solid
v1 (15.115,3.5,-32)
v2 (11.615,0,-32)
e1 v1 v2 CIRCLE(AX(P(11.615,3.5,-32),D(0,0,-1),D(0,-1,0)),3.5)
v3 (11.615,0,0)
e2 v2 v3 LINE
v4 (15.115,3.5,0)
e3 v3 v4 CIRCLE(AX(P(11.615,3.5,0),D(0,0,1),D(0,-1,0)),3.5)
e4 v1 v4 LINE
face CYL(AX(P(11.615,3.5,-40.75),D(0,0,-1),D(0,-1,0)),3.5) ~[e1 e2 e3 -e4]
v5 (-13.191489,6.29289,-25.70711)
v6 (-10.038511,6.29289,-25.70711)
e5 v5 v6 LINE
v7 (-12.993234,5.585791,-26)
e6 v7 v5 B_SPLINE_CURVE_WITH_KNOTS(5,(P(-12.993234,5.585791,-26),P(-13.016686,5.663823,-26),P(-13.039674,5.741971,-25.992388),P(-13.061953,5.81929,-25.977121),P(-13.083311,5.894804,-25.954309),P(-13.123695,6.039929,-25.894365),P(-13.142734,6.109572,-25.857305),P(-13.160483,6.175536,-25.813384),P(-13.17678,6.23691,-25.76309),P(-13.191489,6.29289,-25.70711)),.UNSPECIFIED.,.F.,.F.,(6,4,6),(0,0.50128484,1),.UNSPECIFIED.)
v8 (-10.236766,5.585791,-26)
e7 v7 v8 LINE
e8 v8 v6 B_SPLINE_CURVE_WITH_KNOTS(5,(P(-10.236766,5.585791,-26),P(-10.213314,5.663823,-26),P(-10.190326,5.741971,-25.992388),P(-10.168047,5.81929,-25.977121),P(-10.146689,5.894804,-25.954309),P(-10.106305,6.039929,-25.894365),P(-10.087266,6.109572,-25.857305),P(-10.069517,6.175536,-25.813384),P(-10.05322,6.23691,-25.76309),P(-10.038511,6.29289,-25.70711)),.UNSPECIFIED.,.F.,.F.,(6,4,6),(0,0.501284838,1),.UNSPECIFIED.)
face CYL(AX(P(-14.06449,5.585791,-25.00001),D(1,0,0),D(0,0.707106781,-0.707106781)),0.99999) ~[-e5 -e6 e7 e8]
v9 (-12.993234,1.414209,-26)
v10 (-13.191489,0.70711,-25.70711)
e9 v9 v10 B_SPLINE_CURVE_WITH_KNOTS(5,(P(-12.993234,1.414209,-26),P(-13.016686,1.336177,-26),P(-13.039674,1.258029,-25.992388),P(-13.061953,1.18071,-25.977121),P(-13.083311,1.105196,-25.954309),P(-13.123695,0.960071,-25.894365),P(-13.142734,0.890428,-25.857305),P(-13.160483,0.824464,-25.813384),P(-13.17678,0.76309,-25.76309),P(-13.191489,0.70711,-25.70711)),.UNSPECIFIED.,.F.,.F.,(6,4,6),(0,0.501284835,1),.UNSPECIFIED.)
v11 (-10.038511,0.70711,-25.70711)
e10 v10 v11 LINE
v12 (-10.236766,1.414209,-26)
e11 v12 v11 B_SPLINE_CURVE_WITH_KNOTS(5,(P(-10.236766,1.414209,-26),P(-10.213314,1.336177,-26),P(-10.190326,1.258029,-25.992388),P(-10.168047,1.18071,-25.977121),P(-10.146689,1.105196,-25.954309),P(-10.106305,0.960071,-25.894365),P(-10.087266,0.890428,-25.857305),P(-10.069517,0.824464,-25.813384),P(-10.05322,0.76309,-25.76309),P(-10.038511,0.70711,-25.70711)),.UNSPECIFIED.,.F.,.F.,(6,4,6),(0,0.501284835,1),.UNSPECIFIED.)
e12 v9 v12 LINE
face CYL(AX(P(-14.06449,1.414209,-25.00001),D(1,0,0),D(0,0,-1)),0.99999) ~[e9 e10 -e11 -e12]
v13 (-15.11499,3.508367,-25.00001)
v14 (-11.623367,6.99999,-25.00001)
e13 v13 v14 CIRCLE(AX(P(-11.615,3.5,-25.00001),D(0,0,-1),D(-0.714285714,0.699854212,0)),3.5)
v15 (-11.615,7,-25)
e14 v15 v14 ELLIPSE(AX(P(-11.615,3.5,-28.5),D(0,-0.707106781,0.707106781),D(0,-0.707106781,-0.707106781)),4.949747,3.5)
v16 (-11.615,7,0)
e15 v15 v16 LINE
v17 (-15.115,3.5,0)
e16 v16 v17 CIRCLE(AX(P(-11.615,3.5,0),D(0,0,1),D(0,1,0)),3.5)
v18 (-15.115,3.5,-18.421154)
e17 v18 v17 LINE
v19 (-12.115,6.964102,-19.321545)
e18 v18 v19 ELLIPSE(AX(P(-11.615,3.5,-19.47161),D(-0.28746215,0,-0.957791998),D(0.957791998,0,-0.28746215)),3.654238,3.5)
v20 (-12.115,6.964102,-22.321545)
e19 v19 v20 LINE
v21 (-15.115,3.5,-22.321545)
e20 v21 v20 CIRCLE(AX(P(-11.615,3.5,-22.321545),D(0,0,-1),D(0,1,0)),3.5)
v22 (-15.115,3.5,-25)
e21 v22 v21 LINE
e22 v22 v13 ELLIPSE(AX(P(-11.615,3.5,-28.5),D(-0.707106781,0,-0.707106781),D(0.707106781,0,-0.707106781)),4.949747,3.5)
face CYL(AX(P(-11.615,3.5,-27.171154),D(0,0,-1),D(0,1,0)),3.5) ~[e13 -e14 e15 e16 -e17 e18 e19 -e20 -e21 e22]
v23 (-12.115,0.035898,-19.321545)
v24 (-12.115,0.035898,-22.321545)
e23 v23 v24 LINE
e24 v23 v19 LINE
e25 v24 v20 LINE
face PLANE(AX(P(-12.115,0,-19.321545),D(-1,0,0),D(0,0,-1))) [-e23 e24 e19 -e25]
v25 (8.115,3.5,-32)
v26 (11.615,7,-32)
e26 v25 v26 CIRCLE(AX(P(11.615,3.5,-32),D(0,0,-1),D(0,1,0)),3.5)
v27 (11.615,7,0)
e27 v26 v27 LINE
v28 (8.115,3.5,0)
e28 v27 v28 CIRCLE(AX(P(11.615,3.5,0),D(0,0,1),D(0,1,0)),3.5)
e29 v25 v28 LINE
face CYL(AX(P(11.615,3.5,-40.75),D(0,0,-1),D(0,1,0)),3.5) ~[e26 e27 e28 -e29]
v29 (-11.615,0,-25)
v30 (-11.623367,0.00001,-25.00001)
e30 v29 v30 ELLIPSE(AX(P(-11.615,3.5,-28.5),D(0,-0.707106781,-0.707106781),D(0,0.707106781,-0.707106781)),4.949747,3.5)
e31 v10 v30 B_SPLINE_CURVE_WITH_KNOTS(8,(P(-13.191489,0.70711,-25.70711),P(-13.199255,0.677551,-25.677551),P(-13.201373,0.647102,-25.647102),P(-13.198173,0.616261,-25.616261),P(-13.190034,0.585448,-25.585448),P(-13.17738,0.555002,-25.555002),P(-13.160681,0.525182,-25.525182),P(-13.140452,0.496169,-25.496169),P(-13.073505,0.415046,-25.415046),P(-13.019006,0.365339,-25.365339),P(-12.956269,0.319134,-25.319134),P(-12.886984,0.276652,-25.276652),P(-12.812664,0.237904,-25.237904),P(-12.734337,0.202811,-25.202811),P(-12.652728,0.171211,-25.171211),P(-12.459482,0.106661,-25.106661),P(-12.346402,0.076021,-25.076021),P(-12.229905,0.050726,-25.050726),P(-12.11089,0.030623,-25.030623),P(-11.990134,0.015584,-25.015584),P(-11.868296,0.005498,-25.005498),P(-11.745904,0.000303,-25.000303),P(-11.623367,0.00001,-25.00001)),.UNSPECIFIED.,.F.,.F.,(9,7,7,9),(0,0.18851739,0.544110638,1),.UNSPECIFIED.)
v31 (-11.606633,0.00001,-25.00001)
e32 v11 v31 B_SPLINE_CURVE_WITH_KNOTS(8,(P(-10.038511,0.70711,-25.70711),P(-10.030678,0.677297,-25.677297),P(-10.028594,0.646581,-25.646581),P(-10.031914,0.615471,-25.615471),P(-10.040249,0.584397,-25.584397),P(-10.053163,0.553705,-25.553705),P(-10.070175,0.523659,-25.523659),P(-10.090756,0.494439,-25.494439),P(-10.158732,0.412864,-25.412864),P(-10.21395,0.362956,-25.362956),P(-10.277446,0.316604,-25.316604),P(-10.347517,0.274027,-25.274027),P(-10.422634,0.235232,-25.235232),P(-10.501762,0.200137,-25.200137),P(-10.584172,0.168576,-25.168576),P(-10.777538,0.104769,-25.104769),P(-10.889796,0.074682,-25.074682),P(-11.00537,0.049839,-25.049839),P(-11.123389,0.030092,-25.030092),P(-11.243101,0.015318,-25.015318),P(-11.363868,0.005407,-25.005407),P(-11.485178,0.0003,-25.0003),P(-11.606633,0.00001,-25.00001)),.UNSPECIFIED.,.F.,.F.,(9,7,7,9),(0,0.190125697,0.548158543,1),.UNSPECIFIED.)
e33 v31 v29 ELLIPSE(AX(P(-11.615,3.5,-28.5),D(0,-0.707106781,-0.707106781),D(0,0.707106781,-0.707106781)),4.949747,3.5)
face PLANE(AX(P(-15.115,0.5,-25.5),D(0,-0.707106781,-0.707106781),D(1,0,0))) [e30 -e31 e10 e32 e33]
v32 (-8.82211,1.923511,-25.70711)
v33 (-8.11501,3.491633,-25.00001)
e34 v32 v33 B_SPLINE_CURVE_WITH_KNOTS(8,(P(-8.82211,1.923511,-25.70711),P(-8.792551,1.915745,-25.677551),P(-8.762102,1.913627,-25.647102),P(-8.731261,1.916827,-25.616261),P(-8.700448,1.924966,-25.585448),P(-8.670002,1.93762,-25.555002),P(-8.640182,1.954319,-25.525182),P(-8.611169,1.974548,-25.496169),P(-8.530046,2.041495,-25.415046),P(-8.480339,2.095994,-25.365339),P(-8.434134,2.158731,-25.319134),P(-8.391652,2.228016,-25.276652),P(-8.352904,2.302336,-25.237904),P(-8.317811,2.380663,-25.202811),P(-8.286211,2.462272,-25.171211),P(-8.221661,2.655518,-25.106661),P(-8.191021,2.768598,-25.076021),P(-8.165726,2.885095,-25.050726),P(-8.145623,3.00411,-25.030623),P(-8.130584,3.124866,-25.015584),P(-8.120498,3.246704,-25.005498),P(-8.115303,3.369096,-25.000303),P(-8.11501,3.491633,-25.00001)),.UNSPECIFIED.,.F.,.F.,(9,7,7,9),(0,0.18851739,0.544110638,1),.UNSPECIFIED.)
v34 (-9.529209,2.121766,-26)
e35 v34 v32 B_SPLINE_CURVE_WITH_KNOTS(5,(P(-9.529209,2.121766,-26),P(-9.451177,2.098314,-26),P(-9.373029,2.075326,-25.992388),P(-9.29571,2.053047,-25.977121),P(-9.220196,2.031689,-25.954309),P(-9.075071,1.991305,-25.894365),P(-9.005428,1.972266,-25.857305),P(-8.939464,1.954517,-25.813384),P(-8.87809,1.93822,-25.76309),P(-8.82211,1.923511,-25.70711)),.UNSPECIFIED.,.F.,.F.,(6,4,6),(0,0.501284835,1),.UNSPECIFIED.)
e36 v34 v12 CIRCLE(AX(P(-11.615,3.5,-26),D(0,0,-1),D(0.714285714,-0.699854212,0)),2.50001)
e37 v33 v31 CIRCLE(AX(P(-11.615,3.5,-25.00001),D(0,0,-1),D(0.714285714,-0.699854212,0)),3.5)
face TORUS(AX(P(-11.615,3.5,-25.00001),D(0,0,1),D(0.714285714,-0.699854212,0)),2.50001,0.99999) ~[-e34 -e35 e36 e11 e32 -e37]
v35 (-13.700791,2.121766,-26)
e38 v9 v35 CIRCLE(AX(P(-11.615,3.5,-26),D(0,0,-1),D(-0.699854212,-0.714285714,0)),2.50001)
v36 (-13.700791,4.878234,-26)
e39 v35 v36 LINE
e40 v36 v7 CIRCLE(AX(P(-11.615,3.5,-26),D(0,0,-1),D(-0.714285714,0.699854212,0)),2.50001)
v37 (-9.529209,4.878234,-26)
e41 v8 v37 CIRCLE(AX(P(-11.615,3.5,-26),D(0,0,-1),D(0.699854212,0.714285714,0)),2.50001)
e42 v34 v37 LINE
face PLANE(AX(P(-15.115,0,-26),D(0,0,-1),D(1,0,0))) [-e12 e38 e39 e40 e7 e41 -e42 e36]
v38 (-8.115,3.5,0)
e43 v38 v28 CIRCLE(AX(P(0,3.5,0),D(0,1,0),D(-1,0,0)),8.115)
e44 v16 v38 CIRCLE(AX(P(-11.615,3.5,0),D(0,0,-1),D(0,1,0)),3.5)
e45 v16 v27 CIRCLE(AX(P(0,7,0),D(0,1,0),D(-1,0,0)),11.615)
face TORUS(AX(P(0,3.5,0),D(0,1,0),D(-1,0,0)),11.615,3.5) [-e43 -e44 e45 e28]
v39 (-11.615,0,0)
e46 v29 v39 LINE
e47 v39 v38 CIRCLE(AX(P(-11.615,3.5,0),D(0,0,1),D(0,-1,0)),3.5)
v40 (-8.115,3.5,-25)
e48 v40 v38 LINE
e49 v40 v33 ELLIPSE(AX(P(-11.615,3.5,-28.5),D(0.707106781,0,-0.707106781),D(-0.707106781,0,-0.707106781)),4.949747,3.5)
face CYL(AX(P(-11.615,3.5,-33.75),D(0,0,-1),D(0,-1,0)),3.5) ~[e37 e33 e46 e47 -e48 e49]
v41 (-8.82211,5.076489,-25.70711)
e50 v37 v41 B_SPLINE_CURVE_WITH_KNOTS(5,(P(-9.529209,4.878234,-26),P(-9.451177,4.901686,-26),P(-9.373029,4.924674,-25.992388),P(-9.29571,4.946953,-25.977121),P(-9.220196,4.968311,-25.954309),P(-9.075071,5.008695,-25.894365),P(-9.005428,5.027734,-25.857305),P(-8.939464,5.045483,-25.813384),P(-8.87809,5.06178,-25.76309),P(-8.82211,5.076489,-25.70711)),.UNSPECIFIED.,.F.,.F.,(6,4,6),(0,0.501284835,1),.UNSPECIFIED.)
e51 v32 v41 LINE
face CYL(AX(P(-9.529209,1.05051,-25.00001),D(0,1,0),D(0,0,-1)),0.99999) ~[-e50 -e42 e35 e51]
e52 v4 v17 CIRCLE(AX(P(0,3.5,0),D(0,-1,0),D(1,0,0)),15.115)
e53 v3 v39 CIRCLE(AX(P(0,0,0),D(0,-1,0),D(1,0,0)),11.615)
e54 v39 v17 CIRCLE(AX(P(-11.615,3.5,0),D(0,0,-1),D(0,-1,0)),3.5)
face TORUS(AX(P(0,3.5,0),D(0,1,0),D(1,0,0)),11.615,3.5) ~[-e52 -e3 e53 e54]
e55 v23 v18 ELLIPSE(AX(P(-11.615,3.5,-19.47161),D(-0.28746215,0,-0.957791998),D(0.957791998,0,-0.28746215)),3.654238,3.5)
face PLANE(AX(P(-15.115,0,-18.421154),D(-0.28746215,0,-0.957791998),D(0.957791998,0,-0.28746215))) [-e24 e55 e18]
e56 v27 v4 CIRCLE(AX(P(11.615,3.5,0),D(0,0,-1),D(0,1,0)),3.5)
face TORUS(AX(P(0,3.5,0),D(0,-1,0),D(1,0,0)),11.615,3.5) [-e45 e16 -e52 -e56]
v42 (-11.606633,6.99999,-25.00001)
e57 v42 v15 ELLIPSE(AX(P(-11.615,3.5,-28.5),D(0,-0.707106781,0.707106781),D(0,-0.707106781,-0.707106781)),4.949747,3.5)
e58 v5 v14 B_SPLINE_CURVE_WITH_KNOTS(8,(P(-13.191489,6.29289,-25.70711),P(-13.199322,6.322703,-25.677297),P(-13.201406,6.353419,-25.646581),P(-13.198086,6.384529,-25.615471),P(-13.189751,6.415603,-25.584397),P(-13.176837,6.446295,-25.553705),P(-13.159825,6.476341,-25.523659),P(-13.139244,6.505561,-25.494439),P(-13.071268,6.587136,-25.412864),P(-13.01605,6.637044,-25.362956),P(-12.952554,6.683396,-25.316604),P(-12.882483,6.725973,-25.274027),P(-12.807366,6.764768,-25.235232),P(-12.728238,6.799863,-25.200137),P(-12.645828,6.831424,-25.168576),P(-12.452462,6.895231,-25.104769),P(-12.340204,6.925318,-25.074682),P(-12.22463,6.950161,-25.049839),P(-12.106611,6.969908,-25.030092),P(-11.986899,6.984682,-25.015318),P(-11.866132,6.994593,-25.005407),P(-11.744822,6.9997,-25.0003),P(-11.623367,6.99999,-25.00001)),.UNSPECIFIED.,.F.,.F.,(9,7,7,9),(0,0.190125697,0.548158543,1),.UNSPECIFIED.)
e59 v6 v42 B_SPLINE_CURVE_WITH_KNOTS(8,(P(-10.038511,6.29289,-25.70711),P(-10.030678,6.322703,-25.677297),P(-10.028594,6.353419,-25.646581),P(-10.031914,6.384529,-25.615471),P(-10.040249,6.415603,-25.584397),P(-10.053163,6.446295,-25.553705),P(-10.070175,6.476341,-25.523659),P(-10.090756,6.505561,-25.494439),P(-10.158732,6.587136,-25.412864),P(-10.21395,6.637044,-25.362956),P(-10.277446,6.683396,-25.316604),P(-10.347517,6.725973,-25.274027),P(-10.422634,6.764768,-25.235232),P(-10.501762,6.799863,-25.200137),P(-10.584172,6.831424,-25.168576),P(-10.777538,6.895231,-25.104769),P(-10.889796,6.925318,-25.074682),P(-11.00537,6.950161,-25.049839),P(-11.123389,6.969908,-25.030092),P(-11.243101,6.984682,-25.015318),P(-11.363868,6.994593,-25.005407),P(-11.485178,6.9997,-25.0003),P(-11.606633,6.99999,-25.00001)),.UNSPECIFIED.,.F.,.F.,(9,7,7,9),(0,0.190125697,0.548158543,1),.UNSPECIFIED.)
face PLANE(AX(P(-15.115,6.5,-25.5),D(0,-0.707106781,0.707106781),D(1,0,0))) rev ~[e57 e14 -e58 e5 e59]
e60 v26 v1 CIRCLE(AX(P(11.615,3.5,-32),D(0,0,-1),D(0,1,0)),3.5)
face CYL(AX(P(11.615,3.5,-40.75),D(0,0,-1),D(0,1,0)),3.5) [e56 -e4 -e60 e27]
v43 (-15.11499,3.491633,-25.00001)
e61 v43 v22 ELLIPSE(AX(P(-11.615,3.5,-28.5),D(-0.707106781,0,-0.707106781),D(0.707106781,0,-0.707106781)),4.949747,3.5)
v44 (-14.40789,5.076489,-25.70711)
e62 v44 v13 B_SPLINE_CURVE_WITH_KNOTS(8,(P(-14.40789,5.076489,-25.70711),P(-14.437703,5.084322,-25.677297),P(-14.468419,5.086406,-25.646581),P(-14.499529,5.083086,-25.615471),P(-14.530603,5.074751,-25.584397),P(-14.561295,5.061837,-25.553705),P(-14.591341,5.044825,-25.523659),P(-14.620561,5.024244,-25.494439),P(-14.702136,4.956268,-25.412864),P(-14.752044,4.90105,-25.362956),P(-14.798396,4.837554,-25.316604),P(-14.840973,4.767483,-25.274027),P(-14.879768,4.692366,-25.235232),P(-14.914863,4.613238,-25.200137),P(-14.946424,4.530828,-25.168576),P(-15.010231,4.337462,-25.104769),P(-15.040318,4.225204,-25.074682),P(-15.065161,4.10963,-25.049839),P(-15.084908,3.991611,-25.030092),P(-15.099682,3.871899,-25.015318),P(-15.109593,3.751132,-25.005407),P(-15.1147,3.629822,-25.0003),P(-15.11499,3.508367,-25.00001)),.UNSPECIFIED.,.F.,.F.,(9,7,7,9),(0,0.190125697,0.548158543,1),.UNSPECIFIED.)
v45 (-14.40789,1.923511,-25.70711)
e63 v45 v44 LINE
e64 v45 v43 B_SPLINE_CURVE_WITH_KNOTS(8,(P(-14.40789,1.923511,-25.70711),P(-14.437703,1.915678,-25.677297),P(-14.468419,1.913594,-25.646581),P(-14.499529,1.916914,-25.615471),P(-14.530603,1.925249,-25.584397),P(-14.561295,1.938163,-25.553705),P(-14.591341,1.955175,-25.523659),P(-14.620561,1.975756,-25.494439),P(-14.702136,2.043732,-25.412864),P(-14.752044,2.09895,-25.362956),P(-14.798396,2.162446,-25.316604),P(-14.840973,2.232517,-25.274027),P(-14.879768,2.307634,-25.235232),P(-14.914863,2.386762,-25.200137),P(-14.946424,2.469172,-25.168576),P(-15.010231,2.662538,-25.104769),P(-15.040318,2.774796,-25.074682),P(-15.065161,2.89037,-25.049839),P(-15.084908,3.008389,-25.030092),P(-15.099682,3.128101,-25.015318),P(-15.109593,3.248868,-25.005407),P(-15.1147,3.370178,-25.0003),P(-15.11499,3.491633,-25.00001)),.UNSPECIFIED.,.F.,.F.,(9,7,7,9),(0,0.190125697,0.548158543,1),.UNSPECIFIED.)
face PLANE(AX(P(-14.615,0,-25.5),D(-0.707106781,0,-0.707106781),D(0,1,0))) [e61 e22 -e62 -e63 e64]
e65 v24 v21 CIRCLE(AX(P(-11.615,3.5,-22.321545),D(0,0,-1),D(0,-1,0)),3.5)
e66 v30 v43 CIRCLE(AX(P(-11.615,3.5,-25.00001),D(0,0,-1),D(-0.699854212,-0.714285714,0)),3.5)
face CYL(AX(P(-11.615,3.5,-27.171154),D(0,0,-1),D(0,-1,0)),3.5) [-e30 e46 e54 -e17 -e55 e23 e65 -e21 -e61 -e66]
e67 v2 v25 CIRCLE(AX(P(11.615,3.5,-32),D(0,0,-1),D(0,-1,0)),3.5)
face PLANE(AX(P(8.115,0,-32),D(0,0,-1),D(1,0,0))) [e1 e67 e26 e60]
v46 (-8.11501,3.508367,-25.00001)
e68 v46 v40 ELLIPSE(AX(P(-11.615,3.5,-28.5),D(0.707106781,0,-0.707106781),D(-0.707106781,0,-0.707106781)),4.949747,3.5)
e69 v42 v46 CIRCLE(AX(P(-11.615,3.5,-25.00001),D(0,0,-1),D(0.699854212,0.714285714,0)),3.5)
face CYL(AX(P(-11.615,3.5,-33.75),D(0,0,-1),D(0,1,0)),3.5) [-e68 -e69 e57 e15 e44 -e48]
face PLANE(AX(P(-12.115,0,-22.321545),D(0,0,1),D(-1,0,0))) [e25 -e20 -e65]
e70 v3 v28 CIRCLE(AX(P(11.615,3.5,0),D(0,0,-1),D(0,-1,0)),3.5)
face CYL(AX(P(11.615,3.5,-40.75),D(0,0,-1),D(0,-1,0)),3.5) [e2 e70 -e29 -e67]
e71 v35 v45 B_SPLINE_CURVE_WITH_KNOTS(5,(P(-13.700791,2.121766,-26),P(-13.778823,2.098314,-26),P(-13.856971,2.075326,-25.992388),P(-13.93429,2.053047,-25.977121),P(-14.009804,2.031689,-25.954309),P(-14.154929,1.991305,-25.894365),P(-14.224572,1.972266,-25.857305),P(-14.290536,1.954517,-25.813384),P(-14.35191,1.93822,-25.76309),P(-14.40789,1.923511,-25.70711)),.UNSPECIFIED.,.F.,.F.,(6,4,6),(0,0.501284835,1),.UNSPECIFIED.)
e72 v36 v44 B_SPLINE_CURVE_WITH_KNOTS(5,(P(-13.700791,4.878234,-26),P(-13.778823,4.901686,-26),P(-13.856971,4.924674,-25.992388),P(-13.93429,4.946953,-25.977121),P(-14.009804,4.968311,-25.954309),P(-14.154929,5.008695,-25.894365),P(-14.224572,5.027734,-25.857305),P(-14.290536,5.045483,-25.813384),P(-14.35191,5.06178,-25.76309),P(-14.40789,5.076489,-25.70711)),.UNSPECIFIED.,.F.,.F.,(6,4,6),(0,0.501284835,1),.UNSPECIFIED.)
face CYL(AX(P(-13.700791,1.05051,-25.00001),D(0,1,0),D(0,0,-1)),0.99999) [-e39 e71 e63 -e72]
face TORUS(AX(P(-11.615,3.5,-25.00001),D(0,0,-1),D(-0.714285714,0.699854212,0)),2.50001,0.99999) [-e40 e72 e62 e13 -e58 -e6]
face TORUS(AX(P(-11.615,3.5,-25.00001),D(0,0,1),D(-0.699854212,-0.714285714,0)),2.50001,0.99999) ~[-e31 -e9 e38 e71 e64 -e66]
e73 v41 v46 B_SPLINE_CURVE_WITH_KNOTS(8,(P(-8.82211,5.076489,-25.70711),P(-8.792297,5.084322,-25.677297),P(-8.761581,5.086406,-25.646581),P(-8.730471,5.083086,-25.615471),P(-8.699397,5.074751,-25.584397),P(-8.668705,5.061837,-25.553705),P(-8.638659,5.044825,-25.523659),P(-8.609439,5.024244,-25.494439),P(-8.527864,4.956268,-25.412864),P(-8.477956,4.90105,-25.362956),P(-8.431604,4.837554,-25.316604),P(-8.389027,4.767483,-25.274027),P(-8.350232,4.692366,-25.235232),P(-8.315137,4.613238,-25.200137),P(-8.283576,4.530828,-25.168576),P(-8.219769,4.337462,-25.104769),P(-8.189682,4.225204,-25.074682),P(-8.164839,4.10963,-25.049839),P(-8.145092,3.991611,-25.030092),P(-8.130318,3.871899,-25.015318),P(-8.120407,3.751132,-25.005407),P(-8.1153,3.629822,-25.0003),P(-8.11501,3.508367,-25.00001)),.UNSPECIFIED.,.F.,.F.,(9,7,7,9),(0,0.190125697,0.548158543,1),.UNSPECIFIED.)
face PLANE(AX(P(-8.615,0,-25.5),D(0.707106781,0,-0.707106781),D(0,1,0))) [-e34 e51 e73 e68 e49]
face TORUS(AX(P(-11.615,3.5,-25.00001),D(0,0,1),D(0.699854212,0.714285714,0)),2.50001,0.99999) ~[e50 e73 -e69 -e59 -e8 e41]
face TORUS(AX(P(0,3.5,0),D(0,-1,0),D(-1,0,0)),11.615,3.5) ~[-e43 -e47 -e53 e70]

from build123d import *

# Parameters (mm, degrees)
F0_W         = 7
F0_H         = 1
F1_DEPTH     = 7
F2_SIZE      = 1
F3_T1_DEPTH  = 40.75
F3_T3_DEPTH  = 33.75
F3_T5_DEPTH  = 27.1711544693
F3_T8_ANGLE  = 180
F3_T10_ANGLE = 180
F3_T12_ANGLE = 180
F3_T14_ANGLE = 180
F4_R         = 0.99999


# Not quite as in the source:
# - a fillet or chamfer that OpenCascade refuses, or shapes differently, is made with other operations: its cross-section is extruded or revolved along the edge and cut away or added
# - a fillet or chamfer is up to 0.001 mm smaller than in the source, because OpenCascade refuses the exact size


with BuildPart() as f1:
    # F0 (on Front) → F1 (new body)
    with BuildSketch(Plane.XZ):
        with BuildLine():
            ThreePointArc((-8.115, 0), (0, 8.115), (8.115, 0))
            Line((8.115, 0), (8.115, -32))
            Line((8.115, -32), (15.115, -32))
            Line((15.115, -32), (15.115, 0))
            ThreePointArc((15.115, 0), (0, 15.115), (-15.115, 0))
            Line((-15.115, 0), (-15.115, -18.4211544693))
            Line((-15.115, -18.4211544693), (-12.115, -19.3215445876))
            Line((-12.115, -19.3215445876), (-12.115, -22.3215445876))
            Line((-12.115, -22.3215445876), (-15.115, -22.3215445876))
            Line((-15.115, -22.3215445876), (-15.115, -25))
            Line((-15.115, -25), (-8.115, -25))
            Line((-8.115, -25), (-8.115, 0))
        make_face()
        with Locations((-11.615, -25.5)):
            Rectangle(F0_W, F0_H)
    extrude(amount=-F1_DEPTH)

    # F2
    f2_edges = [f1.edges().sort_by_distance(p)[0] for p in [
        (-8.115, 3.5, -26),
        (-11.615, 0, -26),
        (-11.615, 7, -26),
        (-15.115, 3.5, -26),
    ]]
    chamfer(f2_edges, length=F2_SIZE)

    # F3: fillet of radius 3.5 on 4 edges, made by hand

    # F3_s2 → F3_t1 (cut)
    with BuildSketch(Plane.XY.offset(-40.75)):
        with BuildLine():
            ThreePointArc((11.615, 0), (9.1401262658, 1.0251262658), (8.115, 3.5))
            Line((8.115, 3.5), (8.115, 0))
            Line((8.115, 0), (11.615, 0))
        make_face()
        with BuildLine():
            ThreePointArc((11.615, 0), (14.0898737342, 1.0251262658), (15.115, 3.5))
            Line((15.115, 3.5), (15.115, 0))
            Line((15.115, 0), (11.615, 0))
        make_face()
        with BuildLine():
            ThreePointArc((11.615, 7), (14.0898737342, 5.9748737342), (15.115, 3.5))
            Line((15.115, 3.5), (15.115, 7))
            Line((15.115, 7), (11.615, 7))
        make_face()
        with BuildLine():
            ThreePointArc((11.615, 7), (9.1401262658, 5.9748737342), (8.115, 3.5))
            Line((8.115, 3.5), (8.115, 7))
            Line((8.115, 7), (11.615, 7))
        make_face()
    extrude(amount=F3_T1_DEPTH, mode=Mode.SUBTRACT)

    # F3_s4 → F3_t3 (cut)
    with BuildSketch(Plane.XY.offset(-33.75)):
        with BuildLine():
            ThreePointArc((-11.615, 7), (-9.1401262658, 5.9748737342), (-8.115, 3.5))
            Line((-8.115, 3.5), (-8.115, 7))
            Line((-8.115, 7), (-11.615, 7))
        make_face()
        with BuildLine():
            ThreePointArc((-11.615, 0), (-9.1401262658, 1.0251262658), (-8.115, 3.5))
            Line((-8.115, 3.5), (-8.115, 0))
            Line((-8.115, 0), (-11.615, 0))
        make_face()
    extrude(amount=F3_T3_DEPTH, mode=Mode.SUBTRACT)

    # F3_s6 → F3_t5 (cut)
    with BuildSketch(Plane.XY.offset(-27.1711544693)):
        with BuildLine():
            ThreePointArc((-11.615, 7), (-14.0898737342, 5.9748737342), (-15.115, 3.5))
            Line((-15.115, 3.5), (-15.115, 7))
            Line((-15.115, 7), (-11.615, 7))
        make_face()
        with BuildLine():
            ThreePointArc((-11.615, 0), (-14.0898737342, 1.0251262658), (-15.115, 3.5))
            Line((-15.115, 3.5), (-15.115, 0))
            Line((-15.115, 0), (-11.615, 0))
        make_face()
    extrude(amount=F3_T5_DEPTH, mode=Mode.SUBTRACT)

    # F3_s7 → F3_t8 (revolve, cut)
    with BuildSketch(Plane.XY):
        with BuildLine():
            ThreePointArc((-11.615, 7), (-9.1401262658, 5.9748737342), (-8.115, 3.5))
            Line((-8.115, 3.5), (-8.115, 7))
            Line((-8.115, 7), (-11.615, 7))
        make_face()
    revolve(axis=Axis((0, 7, 0), (0, 1, 0)), revolution_arc=F3_T8_ANGLE, mode=Mode.SUBTRACT)

    # F3_s9 → F3_t10 (revolve, cut)
    with BuildSketch(Plane.XY):
        with BuildLine():
            ThreePointArc((11.615, 7), (14.0898737342, 5.9748737342), (15.115, 3.5))
            Line((15.115, 3.5), (15.115, 7))
            Line((15.115, 7), (11.615, 7))
        make_face()
    revolve(axis=Axis((0, 7, 0), (0, -1, 0)), revolution_arc=F3_T10_ANGLE, mode=Mode.SUBTRACT)

    # F3_s11 → F3_t12 (revolve, cut)
    with BuildSketch(Plane.XY):
        with BuildLine():
            ThreePointArc((11.615, 0), (14.0898737342, 1.0251262658), (15.115, 3.5))
            Line((15.115, 3.5), (15.115, 0))
            Line((15.115, 0), (11.615, 0))
        make_face()
    revolve(axis=Axis((0, 0, 0), (0, -1, 0)), revolution_arc=F3_T12_ANGLE, mode=Mode.SUBTRACT)

    # F3_s13 → F3_t14 (revolve, cut)
    with BuildSketch(Plane.XY):
        with BuildLine():
            ThreePointArc((-11.615, 0), (-9.1401262658, 1.0251262658), (-8.115, 3.5))
            Line((-8.115, 3.5), (-8.115, 0))
            Line((-8.115, 0), (-11.615, 0))
        make_face()
    revolve(axis=Axis((0, 0, 0), (0, 1, 0)), revolution_arc=F3_T14_ANGLE, mode=Mode.SUBTRACT)

    # F4 (radius 1 in the source; OpenCascade refuses exactly that, so slightly less here)
    f4_edges = [f1.edges().sort_by_distance(p)[0] for p in [
        (-11.615, 6, -26),
        (-14.115, 3.5, -26),
        (-11.615, 1, -26),
        (-9.115, 3.5, -26),
        (-9.140126, 5.974874, -26),
        (-14.089874, 5.974874, -26),
        (-14.089874, 1.025126, -26),
        (-9.140126, 1.025126, -26),
    ]]
    fillet(f4_edges, radius=F4_R)


solid = f1.part
